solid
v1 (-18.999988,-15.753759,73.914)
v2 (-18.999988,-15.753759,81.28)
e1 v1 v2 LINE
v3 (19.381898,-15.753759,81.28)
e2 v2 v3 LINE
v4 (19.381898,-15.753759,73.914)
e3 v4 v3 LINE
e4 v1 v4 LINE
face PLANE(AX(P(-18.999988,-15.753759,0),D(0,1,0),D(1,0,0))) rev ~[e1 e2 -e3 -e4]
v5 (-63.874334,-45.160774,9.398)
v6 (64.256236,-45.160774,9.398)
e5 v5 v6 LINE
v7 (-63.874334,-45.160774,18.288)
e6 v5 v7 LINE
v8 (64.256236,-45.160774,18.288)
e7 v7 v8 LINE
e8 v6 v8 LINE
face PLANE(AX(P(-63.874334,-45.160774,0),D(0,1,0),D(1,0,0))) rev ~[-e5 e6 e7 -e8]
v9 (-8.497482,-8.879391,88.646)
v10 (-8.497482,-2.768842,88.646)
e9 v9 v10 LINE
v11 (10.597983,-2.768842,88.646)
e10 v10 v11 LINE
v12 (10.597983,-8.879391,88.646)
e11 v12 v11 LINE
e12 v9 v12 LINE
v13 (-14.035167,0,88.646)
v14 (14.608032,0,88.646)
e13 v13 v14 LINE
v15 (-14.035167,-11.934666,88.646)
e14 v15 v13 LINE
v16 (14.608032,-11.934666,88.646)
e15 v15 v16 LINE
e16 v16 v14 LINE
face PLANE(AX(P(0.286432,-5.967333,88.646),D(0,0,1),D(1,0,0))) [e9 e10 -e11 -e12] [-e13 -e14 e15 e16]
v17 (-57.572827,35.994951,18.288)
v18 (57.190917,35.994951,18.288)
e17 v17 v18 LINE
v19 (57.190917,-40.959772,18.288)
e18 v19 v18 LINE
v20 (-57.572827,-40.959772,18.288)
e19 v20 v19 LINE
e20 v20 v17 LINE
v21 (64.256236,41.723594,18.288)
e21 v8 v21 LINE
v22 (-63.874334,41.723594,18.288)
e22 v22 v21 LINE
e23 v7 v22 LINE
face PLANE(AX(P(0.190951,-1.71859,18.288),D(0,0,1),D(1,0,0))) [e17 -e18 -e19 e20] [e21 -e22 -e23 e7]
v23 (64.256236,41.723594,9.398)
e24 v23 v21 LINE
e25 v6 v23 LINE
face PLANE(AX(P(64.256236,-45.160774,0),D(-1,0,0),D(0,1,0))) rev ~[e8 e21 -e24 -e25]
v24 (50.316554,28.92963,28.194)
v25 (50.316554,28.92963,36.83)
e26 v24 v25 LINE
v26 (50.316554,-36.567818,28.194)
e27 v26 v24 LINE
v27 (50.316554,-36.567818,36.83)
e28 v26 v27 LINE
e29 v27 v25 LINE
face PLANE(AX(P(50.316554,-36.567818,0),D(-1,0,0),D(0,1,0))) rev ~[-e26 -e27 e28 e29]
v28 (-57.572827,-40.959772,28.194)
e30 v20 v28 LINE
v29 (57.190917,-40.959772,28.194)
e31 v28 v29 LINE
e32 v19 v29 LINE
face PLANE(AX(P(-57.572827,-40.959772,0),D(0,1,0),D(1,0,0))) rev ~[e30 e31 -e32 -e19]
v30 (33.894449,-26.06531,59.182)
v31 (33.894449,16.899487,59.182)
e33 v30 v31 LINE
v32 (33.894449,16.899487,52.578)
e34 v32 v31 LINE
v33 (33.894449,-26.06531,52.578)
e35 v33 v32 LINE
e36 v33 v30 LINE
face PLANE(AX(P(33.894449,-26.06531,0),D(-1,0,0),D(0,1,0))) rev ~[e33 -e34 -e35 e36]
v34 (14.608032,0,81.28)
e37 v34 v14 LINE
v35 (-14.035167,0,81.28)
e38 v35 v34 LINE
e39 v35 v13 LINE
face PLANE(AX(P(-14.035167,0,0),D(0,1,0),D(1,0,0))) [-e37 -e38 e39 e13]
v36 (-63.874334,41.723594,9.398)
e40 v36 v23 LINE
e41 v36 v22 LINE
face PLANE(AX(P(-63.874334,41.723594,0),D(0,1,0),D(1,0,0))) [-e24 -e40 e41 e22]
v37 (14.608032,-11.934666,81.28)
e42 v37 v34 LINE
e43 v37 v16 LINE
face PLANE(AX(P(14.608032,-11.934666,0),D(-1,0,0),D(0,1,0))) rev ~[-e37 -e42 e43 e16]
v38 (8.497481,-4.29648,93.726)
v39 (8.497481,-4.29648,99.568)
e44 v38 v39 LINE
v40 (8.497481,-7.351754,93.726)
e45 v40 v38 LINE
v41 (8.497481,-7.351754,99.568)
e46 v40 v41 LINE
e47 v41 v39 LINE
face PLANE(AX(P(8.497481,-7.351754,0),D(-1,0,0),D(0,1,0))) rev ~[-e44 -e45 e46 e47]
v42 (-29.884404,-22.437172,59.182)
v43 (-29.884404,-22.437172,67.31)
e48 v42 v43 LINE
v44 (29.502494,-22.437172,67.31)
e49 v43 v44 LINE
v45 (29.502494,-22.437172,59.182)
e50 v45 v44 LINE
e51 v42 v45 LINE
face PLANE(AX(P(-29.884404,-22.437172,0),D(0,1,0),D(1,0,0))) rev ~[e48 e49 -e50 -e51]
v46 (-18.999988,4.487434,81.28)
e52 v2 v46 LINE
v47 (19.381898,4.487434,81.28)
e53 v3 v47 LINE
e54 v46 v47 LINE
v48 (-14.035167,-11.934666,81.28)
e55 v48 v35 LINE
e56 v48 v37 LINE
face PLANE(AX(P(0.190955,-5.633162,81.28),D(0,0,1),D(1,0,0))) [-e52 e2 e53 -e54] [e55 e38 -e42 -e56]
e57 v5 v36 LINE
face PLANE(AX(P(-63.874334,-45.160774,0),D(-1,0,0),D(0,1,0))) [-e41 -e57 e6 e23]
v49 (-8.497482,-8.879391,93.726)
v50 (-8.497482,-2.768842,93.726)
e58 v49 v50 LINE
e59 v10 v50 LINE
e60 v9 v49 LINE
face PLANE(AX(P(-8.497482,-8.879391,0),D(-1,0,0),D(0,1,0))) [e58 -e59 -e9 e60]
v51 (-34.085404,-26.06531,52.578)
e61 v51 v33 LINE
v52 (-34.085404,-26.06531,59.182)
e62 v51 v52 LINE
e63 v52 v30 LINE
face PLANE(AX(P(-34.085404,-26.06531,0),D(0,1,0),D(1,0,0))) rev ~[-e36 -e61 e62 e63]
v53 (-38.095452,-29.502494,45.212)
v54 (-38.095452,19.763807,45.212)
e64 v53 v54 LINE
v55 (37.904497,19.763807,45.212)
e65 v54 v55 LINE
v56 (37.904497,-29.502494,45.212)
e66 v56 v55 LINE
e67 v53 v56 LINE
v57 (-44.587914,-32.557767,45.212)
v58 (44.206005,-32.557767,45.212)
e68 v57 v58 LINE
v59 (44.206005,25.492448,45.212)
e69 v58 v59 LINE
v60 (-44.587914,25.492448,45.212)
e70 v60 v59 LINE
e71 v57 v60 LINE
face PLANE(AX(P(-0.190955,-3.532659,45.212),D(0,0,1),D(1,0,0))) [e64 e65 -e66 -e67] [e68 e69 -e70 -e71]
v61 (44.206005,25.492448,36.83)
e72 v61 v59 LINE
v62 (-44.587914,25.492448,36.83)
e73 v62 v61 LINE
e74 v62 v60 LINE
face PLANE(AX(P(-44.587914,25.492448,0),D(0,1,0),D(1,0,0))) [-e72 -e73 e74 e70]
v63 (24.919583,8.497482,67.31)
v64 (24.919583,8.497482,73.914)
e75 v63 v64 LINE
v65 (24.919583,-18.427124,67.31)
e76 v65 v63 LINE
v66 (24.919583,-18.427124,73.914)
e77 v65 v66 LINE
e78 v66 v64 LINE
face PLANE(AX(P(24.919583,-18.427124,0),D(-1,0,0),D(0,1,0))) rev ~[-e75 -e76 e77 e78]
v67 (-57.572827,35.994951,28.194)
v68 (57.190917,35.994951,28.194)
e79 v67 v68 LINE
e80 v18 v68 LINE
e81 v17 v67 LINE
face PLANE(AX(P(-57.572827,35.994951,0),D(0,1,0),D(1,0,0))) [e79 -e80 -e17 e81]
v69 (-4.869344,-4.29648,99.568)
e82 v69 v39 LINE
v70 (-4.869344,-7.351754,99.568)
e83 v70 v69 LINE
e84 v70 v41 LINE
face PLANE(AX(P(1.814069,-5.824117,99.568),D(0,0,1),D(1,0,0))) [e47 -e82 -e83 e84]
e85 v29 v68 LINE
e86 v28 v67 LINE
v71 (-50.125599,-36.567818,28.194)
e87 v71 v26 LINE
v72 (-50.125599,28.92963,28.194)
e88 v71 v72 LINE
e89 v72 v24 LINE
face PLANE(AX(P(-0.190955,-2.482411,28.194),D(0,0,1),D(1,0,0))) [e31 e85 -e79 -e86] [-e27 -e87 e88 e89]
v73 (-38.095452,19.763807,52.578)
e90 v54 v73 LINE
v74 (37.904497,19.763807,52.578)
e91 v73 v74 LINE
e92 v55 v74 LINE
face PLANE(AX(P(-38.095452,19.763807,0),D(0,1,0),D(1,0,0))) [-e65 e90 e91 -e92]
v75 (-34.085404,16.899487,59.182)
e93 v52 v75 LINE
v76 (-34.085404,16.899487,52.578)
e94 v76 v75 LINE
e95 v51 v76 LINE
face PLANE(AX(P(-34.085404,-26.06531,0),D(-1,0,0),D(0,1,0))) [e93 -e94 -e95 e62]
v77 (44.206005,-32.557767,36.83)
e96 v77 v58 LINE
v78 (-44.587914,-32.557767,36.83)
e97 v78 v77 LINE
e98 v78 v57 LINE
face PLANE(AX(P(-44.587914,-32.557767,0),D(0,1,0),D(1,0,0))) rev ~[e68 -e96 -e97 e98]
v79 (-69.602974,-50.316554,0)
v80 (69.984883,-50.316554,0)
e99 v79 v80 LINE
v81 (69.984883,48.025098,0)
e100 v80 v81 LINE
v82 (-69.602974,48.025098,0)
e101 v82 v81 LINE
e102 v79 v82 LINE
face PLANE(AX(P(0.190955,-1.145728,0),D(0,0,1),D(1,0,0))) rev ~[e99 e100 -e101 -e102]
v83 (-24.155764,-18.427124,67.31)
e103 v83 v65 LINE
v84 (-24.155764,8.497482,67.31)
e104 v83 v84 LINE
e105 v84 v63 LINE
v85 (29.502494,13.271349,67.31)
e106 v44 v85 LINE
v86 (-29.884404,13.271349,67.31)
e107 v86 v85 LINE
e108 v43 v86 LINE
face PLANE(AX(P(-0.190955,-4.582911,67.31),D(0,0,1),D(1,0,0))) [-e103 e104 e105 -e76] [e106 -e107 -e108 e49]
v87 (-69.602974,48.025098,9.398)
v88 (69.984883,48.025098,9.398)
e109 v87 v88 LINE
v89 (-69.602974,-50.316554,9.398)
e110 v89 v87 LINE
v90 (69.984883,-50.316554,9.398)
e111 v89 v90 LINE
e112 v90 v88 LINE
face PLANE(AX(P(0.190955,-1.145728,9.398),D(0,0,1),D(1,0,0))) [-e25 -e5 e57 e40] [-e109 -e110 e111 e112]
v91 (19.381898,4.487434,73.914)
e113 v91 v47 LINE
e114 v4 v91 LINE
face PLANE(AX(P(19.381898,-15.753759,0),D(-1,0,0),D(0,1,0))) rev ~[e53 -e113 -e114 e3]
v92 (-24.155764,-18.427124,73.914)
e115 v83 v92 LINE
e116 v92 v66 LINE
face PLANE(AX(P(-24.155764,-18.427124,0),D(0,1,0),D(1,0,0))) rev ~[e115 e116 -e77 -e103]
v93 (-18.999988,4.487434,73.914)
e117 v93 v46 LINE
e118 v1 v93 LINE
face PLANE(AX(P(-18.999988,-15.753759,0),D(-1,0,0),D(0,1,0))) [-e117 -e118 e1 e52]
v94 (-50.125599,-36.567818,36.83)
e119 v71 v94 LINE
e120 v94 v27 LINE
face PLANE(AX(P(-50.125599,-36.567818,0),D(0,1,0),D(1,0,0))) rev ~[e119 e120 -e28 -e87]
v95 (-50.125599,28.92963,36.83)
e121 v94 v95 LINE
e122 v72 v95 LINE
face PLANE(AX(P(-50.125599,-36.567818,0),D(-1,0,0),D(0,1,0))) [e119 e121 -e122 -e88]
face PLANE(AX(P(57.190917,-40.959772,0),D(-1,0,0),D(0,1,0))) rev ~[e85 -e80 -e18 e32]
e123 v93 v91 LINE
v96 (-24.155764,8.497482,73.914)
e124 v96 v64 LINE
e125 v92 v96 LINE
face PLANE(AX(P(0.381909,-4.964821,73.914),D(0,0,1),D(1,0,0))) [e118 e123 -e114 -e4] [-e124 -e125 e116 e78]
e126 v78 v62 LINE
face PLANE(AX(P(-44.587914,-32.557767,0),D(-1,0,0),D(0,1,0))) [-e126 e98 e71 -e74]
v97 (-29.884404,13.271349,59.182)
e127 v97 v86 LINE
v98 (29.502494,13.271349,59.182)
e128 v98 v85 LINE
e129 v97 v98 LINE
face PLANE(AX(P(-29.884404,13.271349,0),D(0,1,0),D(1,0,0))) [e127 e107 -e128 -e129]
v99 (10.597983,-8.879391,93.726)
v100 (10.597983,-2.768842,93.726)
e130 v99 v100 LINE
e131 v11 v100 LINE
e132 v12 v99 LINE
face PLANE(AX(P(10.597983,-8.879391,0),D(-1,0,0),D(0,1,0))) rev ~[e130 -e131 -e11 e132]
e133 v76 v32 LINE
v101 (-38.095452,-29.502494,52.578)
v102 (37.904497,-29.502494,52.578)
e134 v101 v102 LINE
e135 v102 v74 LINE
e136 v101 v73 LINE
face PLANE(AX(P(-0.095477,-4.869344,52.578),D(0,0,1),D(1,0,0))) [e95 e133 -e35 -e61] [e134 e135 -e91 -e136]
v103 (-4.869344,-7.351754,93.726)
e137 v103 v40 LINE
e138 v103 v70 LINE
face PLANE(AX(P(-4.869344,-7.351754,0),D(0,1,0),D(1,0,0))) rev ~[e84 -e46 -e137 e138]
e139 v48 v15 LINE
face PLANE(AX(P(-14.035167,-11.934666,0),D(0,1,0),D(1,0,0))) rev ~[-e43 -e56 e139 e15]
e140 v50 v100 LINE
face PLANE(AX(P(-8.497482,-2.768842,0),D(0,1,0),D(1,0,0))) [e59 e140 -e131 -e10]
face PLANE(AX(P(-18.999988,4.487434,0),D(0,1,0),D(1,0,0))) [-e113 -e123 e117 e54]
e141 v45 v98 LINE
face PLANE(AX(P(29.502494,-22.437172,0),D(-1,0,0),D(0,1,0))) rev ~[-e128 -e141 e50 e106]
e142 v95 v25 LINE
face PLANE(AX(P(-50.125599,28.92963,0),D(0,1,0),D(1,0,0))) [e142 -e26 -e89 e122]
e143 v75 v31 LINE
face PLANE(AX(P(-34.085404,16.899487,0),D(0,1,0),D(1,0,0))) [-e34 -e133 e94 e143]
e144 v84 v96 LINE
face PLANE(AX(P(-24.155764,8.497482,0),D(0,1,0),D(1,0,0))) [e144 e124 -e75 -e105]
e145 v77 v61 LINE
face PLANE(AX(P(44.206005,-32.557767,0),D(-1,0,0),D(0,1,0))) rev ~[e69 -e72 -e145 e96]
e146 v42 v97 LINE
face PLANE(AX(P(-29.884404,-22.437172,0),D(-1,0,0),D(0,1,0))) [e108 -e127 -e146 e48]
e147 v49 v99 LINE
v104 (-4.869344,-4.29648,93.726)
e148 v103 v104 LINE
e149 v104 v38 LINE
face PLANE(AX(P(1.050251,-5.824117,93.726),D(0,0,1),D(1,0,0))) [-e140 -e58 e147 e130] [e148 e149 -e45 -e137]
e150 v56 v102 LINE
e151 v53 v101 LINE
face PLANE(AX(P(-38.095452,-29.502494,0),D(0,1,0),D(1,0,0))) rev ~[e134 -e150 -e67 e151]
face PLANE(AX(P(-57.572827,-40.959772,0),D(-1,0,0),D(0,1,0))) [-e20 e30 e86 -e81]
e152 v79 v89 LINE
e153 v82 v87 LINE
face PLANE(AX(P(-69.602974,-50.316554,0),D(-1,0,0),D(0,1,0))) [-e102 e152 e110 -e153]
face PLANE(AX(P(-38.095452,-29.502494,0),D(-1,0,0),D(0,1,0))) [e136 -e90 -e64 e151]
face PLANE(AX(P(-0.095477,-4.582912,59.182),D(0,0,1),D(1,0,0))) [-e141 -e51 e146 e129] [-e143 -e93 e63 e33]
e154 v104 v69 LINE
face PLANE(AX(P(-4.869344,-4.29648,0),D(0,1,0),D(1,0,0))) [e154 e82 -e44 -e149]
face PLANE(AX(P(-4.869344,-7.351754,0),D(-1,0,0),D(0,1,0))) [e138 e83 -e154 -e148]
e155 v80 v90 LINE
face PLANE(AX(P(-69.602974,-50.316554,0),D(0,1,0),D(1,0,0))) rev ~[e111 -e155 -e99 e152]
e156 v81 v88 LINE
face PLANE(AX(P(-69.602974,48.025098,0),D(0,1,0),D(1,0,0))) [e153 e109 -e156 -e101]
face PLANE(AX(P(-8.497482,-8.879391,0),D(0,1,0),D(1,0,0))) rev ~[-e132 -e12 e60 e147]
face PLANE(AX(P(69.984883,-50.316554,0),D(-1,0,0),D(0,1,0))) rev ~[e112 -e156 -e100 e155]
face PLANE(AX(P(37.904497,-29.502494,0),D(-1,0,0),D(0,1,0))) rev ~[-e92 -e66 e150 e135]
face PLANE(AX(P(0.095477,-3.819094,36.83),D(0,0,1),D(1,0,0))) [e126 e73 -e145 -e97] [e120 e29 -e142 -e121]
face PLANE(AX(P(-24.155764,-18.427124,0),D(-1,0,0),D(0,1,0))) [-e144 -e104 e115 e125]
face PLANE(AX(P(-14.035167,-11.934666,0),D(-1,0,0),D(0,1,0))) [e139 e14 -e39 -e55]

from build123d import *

# Parameters (mm, degrees)
F0_W      = 13.366825413
F0_H      = 3.0552744865
F1_DEPTH  = 99.568
F0_W_2    = 19.0954655409
F0_H_2    = 6.1105492059
F2_DEPTH  = 93.726
F0_W_3    = 28.6431992427
F0_H_3    = 11.9346659631
F3_DEPTH  = 88.646
F0_W_4    = 38.3818857372
F0_H_4    = 20.2411934733
F4_DEPTH  = 81.28
F0_W_5    = 49.0753464401
F0_H_5    = 26.9246064126
F5_DEPTH  = 73.914
F0_W_6    = 59.3868978322
F0_H_6    = 35.7085214928
F6_DEPTH  = 67.31
F0_W_7    = 67.9798536003
F0_H_7    = 42.964797467
F7_DEPTH  = 59.182
F0_W_8    = 75.9999491274
F0_H_8    = 49.2663010955
F8_DEPTH  = 52.578
F0_W_9    = 88.7939184904
F0_H_9    = 58.0502152443
F9_DEPTH  = 45.212
F0_W_10   = 100.4421524704
F0_H_10   = 65.4974486679
F10_DEPTH = 36.83
F0_W_11   = 114.7637441754
F0_H_11   = 76.9547224045
F11_DEPTH = 28.194
F0_W_12   = 128.1305700541
F0_H_12   = 86.884368211
F12_DEPTH = 18.288
F0_W_13   = 139.5878568292
F0_H_13   = 98.3416512609
F13_DEPTH = 9.398


# Not quite as in the source:
# - the program builds the solid bodies; features that only make, move or delete a surface that nothing else refers to are left out


with BuildPart() as f1:
    # F0 (on Top) → F1 (new body)
    with BuildSketch(Plane.XY):
        with Locations((1.8140685279, -5.8241172228)):
            Rectangle(F0_W, F0_H)
    extrude(amount=F1_DEPTH)

    # F0 (on Top) → F2 (join)
    with BuildSketch(Plane.XY):
        with Locations((1.0502506047, -5.8241168736)):
            Rectangle(F0_W_2, F0_H_2)
        with Locations((1.8140685279, -5.8241172228)):
            Rectangle(F0_W, F0_H, mode=Mode.SUBTRACT)
    extrude(amount=F2_DEPTH)

    # F0 (on Top) → F3 (join)
    with BuildSketch(Plane.XY):
        with Locations((0.2864324488, -5.9673329815)):
            Rectangle(F0_W_3, F0_H_3)
        with Locations((1.0502506047, -5.8241168736)):
            Rectangle(F0_W_2, F0_H_2, mode=Mode.SUBTRACT)
    extrude(amount=F3_DEPTH)

    # F0 (on Top) → F4 (join)
    with BuildSketch(Plane.XY):
        with Locations((0.1909546554, -5.6331623346)):
            Rectangle(F0_W_4, F0_H_4)
        with Locations((0.2864324488, -5.9673329815)):
            Rectangle(F0_W_3, F0_H_3, mode=Mode.SUBTRACT)
    extrude(amount=F4_DEPTH)

    # F0 (on Top) → F5 (join)
    with BuildSketch(Plane.XY):
        with Locations((0.3819093108, -4.9648210406)):
            Rectangle(F0_W_5, F0_H_5)
        with Locations((0.1909546554, -5.6331623346)):
            Rectangle(F0_W_4, F0_H_4, mode=Mode.SUBTRACT)
    extrude(amount=F5_DEPTH)

    # F0 (on Top) → F6 (join)
    with BuildSketch(Plane.XY):
        with Locations((-0.1909546554, -4.5829112642)):
            Rectangle(F0_W_6, F0_H_6)
        with Locations((0.3819093108, -4.9648210406)):
            Rectangle(F0_W_5, F0_H_5, mode=Mode.SUBTRACT)
    extrude(amount=F6_DEPTH)

    # F0 (on Top) → F7 (join)
    with BuildSketch(Plane.XY):
        with Locations((-0.0954773277, -4.5829117298)):
            Rectangle(F0_W_7, F0_H_7)
        with Locations((-0.1909546554, -4.5829112642)):
            Rectangle(F0_W_6, F0_H_6, mode=Mode.SUBTRACT)
    extrude(amount=F7_DEPTH)

    # F0 (on Top) → F8 (join)
    with BuildSketch(Plane.XY):
        with Locations((-0.0954773277, -4.8693437129)):
            Rectangle(F0_W_8, F0_H_8)
        with Locations((-0.0954773277, -4.5829117298)):
            Rectangle(F0_W_7, F0_H_7, mode=Mode.SUBTRACT)
    extrude(amount=F8_DEPTH)

    # F0 (on Top) → F9 (join)
    with BuildSketch(Plane.XY):
        with Locations((-0.1909546554, -3.5326592624)):
            Rectangle(F0_W_9, F0_H_9)
        with Locations((-0.0954773277, -4.8693437129)):
            Rectangle(F0_W_8, F0_H_8, mode=Mode.SUBTRACT)
    extrude(amount=F9_DEPTH)

    # F0 (on Top) → F10 (join)
    with BuildSketch(Plane.XY):
        with Locations((0.0954773277, -3.8190940395)):
            Rectangle(F0_W_10, F0_H_10)
        with Locations((-0.1909546554, -3.5326592624)):
            Rectangle(F0_W_9, F0_H_9, mode=Mode.SUBTRACT)
    extrude(amount=F10_DEPTH)

    # F0 (on Top) → F11 (join)
    with BuildSketch(Plane.XY):
        with Locations((-0.1909546554, -2.4824105203)):
            Rectangle(F0_W_11, F0_H_11)
        with Locations((0.0954773277, -3.8190940395)):
            Rectangle(F0_W_10, F0_H_10, mode=Mode.SUBTRACT)
    extrude(amount=F11_DEPTH)

    # F0 (on Top) → F12 (join)
    with BuildSketch(Plane.XY):
        with Locations((0.1909509301, -1.718590036)):
            Rectangle(F0_W_12, F0_H_12)
        with Locations((-0.1909546554, -2.4824105203)):
            Rectangle(F0_W_11, F0_H_11, mode=Mode.SUBTRACT)
    extrude(amount=F12_DEPTH)

    # F0 (on Top) → F13 (join)
    with BuildSketch(Plane.XY):
        with Locations((0.1909546554, -1.1457279325)):
            Rectangle(F0_W_13, F0_H_13)
        with Locations((0.1909509301, -1.718590036)):
            Rectangle(F0_W_12, F0_H_12, mode=Mode.SUBTRACT)
    extrude(amount=F13_DEPTH)


solid = f1.part
